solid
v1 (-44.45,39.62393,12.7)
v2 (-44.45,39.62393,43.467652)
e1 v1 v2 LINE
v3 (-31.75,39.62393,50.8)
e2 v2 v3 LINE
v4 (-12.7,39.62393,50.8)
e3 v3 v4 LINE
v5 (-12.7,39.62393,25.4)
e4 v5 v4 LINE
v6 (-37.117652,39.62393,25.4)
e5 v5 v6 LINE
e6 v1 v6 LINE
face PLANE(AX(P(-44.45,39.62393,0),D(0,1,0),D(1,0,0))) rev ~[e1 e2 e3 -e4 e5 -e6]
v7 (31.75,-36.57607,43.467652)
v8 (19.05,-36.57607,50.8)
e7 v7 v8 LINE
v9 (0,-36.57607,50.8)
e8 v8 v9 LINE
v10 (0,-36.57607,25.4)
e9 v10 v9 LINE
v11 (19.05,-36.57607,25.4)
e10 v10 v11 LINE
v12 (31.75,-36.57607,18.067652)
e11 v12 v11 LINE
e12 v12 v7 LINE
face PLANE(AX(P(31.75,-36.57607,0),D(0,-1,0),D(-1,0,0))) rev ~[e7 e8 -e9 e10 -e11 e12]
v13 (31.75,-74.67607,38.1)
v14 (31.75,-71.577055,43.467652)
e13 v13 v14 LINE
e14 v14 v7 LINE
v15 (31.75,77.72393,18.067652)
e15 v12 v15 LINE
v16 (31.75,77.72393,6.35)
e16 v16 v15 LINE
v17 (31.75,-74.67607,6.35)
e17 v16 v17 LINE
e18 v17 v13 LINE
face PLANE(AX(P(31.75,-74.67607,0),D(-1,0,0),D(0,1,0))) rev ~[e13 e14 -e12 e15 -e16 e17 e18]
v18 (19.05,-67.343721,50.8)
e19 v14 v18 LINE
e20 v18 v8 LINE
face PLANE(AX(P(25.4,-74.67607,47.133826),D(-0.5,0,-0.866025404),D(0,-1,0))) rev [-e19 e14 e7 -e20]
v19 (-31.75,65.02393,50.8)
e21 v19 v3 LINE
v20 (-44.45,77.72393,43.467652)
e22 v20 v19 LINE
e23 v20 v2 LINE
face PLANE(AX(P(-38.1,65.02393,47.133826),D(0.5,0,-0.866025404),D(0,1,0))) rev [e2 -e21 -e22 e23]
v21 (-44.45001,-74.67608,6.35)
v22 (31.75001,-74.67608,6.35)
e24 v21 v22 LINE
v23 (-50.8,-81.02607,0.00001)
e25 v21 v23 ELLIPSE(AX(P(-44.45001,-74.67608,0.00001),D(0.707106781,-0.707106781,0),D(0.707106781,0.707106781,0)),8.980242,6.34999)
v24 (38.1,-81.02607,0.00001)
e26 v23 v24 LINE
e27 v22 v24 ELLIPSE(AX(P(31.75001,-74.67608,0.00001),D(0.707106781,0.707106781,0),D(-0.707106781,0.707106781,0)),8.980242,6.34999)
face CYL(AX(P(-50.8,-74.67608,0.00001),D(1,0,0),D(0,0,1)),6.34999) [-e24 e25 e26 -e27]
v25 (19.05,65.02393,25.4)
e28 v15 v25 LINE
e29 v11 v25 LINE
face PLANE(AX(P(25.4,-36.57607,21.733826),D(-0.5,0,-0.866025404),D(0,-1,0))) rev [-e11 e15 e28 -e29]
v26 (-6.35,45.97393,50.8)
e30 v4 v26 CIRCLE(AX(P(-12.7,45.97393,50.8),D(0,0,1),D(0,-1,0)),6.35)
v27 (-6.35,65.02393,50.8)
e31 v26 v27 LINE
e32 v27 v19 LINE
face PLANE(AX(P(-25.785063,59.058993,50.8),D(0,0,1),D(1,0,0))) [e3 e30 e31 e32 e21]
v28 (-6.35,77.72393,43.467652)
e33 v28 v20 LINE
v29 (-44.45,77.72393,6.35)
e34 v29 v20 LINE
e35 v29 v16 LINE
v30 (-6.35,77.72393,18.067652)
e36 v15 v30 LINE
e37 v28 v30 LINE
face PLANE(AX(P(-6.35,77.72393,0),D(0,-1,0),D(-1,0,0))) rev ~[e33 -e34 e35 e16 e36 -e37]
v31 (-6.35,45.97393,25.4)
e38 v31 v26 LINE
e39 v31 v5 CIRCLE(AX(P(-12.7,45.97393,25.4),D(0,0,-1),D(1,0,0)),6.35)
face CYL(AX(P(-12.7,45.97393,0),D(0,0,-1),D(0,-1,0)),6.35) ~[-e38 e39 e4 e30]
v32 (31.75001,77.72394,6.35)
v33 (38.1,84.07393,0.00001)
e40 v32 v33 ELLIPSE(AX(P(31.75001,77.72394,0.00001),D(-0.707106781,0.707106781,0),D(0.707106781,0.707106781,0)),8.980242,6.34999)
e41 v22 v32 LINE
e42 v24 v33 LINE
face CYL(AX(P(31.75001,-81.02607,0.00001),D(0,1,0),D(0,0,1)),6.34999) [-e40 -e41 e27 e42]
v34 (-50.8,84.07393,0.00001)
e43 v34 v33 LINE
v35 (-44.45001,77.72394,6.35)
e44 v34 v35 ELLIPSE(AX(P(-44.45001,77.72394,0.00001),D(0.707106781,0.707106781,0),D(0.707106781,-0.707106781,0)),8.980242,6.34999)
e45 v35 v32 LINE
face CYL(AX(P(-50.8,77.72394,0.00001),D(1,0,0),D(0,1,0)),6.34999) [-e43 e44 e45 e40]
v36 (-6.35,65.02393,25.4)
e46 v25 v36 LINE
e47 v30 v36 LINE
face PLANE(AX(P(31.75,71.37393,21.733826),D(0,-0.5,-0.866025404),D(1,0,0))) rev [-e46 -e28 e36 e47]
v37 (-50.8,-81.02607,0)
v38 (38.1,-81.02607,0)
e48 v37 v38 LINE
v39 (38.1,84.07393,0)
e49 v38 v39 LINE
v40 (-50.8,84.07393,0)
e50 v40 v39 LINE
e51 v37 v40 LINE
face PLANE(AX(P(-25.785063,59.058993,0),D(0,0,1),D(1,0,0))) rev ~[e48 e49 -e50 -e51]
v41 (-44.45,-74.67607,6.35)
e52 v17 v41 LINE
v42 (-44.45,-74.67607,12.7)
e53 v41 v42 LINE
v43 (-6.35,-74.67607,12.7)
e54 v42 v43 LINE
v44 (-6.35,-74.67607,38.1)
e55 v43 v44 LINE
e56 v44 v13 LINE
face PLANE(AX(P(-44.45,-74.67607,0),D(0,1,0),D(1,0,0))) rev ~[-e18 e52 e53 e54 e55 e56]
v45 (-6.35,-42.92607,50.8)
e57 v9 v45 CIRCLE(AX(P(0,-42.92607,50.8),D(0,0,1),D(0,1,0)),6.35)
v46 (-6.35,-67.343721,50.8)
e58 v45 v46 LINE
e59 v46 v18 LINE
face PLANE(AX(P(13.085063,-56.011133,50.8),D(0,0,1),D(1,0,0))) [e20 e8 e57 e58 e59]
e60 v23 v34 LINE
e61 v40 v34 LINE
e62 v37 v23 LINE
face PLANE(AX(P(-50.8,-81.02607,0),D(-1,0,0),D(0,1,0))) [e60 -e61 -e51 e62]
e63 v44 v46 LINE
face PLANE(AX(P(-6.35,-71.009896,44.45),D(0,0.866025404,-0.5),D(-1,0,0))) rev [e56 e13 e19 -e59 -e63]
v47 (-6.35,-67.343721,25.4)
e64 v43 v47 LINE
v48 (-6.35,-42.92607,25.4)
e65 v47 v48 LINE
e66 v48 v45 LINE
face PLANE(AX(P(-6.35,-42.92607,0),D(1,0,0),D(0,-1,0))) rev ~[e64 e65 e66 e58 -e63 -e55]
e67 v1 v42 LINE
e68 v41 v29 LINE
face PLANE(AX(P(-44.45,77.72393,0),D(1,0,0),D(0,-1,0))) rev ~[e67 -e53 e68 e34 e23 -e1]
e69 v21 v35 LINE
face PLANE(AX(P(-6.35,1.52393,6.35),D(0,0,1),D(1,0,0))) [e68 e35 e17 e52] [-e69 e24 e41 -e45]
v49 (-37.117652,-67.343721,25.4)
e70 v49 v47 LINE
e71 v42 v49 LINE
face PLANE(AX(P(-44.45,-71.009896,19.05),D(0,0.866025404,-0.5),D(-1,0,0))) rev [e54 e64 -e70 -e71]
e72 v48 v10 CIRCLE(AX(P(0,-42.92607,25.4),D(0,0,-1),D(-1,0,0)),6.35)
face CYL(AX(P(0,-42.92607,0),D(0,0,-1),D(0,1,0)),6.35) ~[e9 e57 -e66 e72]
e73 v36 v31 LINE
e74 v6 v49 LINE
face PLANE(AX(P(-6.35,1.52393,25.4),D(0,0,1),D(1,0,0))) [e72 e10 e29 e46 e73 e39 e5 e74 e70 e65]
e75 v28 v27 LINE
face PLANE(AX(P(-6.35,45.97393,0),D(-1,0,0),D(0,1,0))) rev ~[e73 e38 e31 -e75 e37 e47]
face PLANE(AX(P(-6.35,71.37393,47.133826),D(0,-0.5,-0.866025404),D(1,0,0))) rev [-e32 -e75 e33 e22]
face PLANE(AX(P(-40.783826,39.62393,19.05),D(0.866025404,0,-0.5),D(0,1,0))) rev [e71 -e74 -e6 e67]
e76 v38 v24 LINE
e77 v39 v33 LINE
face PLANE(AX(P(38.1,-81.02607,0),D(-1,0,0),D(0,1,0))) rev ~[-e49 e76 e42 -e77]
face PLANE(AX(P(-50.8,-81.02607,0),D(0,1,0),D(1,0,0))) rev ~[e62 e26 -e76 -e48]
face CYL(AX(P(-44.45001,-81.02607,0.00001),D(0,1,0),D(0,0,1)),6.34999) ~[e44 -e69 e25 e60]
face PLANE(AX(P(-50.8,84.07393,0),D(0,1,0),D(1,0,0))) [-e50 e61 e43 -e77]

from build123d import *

# Parameters (mm, degrees)
F0_W        = 88.9
F0_H        = 165.1
F1_DEPTH    = 6.35
F2_DEPTH    = 25.4
F3_DEPTH    = 50.8
F4_R        = 6.34999
F5_C1_SIZE2 = 12.7
F5_C1_SIZE  = 7.3323484187
F5_C2_SIZE2 = 12.7
F5_C2_SIZE  = 7.3323484187
F5_C3_SIZE2 = 12.7
F5_C3_SIZE  = 7.3323484187
F5_C4_SIZE2 = 12.7
F5_C4_SIZE  = 7.3323484187
F5_C5_SIZE2 = 7.3323484187
F5_C5_SIZE  = 12.7
F5_C6_SIZE2 = 7.3323484187
F5_C6_SIZE  = 12.7
F5_C7_SIZE2 = 12.7
F5_C7_SIZE  = 7.3323484187
F5_C8_SIZE2 = 7.3323484187
F5_C8_SIZE  = 12.7


# Not quite as in the source:
# - a fillet or chamfer is up to 0.001 mm smaller than in the source, because OpenCascade refuses the exact size


with BuildPart() as f1:
    # F0 (on Top) → F1 (new body)
    with BuildSketch(Plane.XY):
        with Locations((-6.35, 1.5239301443)):
            Rectangle(F0_W, F0_H)
        Polygon((-44.45, 39.6239301443), (-44.45, 77.7239301443), (-6.35, 77.7239301443), (31.75, 77.7239301443), (31.75, -36.5760698557), (31.75, -74.6760698557), (-6.35, -74.6760698557), (-44.45, -74.6760698557), align=None, mode=Mode.SUBTRACT)
        with BuildLine():
            Line((31.75, 77.7239301443), (-6.35, 77.7239301443))
            Line((-6.35, 77.7239301443), (-6.35, 45.9739301443))
            ThreePointArc((-6.35, 45.9739301443), (-8.2098719395, 41.4838020838), (-12.7, 39.6239301443))
            Line((-12.7, 39.6239301443), (-44.45, 39.6239301443))
            Line((-44.45, 39.6239301443), (-44.45, -74.6760698557))
            Line((-44.45, -74.6760698557), (-6.35, -74.6760698557))
            Line((-6.35, -74.6760698557), (-6.35, -42.9260698557))
            ThreePointArc((-6.35, -42.9260698557), (-4.4901280605, -38.4359417952), (0, -36.5760698557))
            Line((0, -36.5760698557), (31.75, -36.5760698557))
            Line((31.75, -36.5760698557), (31.75, 77.7239301443))
        make_face()
        with BuildLine():
            Line((-6.35, 77.7239301443), (-44.45, 77.7239301443))
            Line((-44.45, 77.7239301443), (-44.45, 39.6239301443))
            Line((-44.45, 39.6239301443), (-12.7, 39.6239301443))
            ThreePointArc((-12.7, 39.6239301443), (-8.2098719395, 41.4838020838), (-6.35, 45.9739301443))
            Line((-6.35, 45.9739301443), (-6.35, 77.7239301443))
        make_face()
        with BuildLine():
            Line((31.75, -74.6760698557), (31.75, -36.5760698557))
            Line((31.75, -36.5760698557), (0, -36.5760698557))
            ThreePointArc((0, -36.5760698557), (-4.4901280605, -38.4359417952), (-6.35, -42.9260698557))
            Line((-6.35, -42.9260698557), (-6.35, -74.6760698557))
            Line((-6.35, -74.6760698557), (31.75, -74.6760698557))
        make_face()
    extrude(amount=F1_DEPTH)

    # F0 (on Top) → F2 (join)
    with BuildSketch(Plane.XY):
        with BuildLine():
            Line((31.75, 77.7239301443), (-6.35, 77.7239301443))
            Line((-6.35, 77.7239301443), (-6.35, 45.9739301443))
            ThreePointArc((-6.35, 45.9739301443), (-8.2098719395, 41.4838020838), (-12.7, 39.6239301443))
            Line((-12.7, 39.6239301443), (-44.45, 39.6239301443))
            Line((-44.45, 39.6239301443), (-44.45, -74.6760698557))
            Line((-44.45, -74.6760698557), (-6.35, -74.6760698557))
            Line((-6.35, -74.6760698557), (-6.35, -42.9260698557))
            ThreePointArc((-6.35, -42.9260698557), (-4.4901280605, -38.4359417952), (0, -36.5760698557))
            Line((0, -36.5760698557), (31.75, -36.5760698557))
            Line((31.75, -36.5760698557), (31.75, 77.7239301443))
        make_face()
    extrude(amount=F2_DEPTH)

    # F0 (on Top) → F3 (join)
    with BuildSketch(Plane.XY):
        with BuildLine():
            Line((-6.35, 77.7239301443), (-44.45, 77.7239301443))
            Line((-44.45, 77.7239301443), (-44.45, 39.6239301443))
            Line((-44.45, 39.6239301443), (-12.7, 39.6239301443))
            ThreePointArc((-12.7, 39.6239301443), (-8.2098719395, 41.4838020838), (-6.35, 45.9739301443))
            Line((-6.35, 45.9739301443), (-6.35, 77.7239301443))
        make_face()
        with BuildLine():
            Line((31.75, -74.6760698557), (31.75, -36.5760698557))
            Line((31.75, -36.5760698557), (0, -36.5760698557))
            ThreePointArc((0, -36.5760698557), (-4.4901280605, -38.4359417952), (-6.35, -42.9260698557))
            Line((-6.35, -42.9260698557), (-6.35, -74.6760698557))
            Line((-6.35, -74.6760698557), (31.75, -74.6760698557))
        make_face()
    extrude(amount=F3_DEPTH)

    # F4 (radius 6.35 in the source; OpenCascade refuses exactly that, so slightly less here)
    f4_edges = [f1.edges().sort_by_distance(p)[0] for p in [
        (38.1, 1.52393, 6.35),
        (-6.35, -81.02607, 6.35),
        (-6.35, 84.07393, 6.35),
        (-50.8, 1.52393, 6.35),
    ]]
    fillet(f4_edges, radius=F4_R)

    # F5: chamfer of 12.7 x 7.3323484187 on 8 edges, made by hand

    # F5_c1
    f5_c1_edges = [f1.edges().sort_by_distance(p)[0] for p in [
        (12.7, 77.7239301443, 25.4),
    ]]
    f5_c1_side = f1.faces().sort_by_distance((12.7, 77.7239301443, 25.2533530316))[0]
    chamfer(f5_c1_edges, length=F5_C1_SIZE, length2=F5_C1_SIZE2, reference=f5_c1_side)

    # F5_c2
    f5_c2_edges = [f1.edges().sort_by_distance(p)[0] for p in [
        (-25.4, 77.7239301443, 50.8),
    ]]
    f5_c2_side = f1.faces().sort_by_distance((-25.4, 77.7239301443, 50.6533530316))[0]
    chamfer(f5_c2_edges, length=F5_C2_SIZE, length2=F5_C2_SIZE2, reference=f5_c2_side)

    # F5_c3
    f5_c3_edges = [f1.edges().sort_by_distance(p)[0] for p in [
        (31.75, -55.6260698557, 50.8),
    ]]
    f5_c3_side = f1.faces().sort_by_distance((31.75, -55.6260698557, 50.6533530316))[0]
    chamfer(f5_c3_edges, length=F5_C3_SIZE, length2=F5_C3_SIZE2, reference=f5_c3_side)

    # F5_c4
    f5_c4_edges = [f1.edges().sort_by_distance(p)[0] for p in [
        (31.75, 14.2239301443, 25.4),
    ]]
    f5_c4_side = f1.faces().sort_by_distance((31.75, 14.2239301443, 25.2533530316))[0]
    chamfer(f5_c4_edges, length=F5_C4_SIZE, length2=F5_C4_SIZE2, reference=f5_c4_side)

    # F5_c5
    f5_c5_edges = [f1.edges().sort_by_distance(p)[0] for p in [
        (-25.4, -74.6760698557, 25.4),
    ]]
    f5_c5_side = f1.faces().sort_by_distance((-25.4, -74.6760698557, 25.2533530316))[0]
    chamfer(f5_c5_edges, length=F5_C5_SIZE, length2=F5_C5_SIZE2, reference=f5_c5_side)

    # F5_c6
    f5_c6_edges = [f1.edges().sort_by_distance(p)[0] for p in [
        (6.35, -74.6760698557, 50.8),
    ]]
    f5_c6_side = f1.faces().sort_by_distance((6.35, -74.6760698557, 50.6533530316))[0]
    chamfer(f5_c6_edges, length=F5_C6_SIZE, length2=F5_C6_SIZE2, reference=f5_c6_side)

    # F5_c7
    f5_c7_edges = [f1.edges().sort_by_distance(p)[0] for p in [
        (-44.45, 52.3239301443, 50.8),
    ]]
    f5_c7_side = f1.faces().sort_by_distance((-44.45, 52.3239301443, 50.6533530316))[0]
    chamfer(f5_c7_edges, length=F5_C7_SIZE, length2=F5_C7_SIZE2, reference=f5_c7_side)

    # F5_c8
    f5_c8_edges = [f1.edges().sort_by_distance(p)[0] for p in [
        (-44.45, -13.8598956463, 25.4),
    ]]
    f5_c8_side = f1.faces().sort_by_distance((-44.45, -13.8598956463, 25.2533530316))[0]
    chamfer(f5_c8_edges, length=F5_C8_SIZE, length2=F5_C8_SIZE2, reference=f5_c8_side)


solid = f1.part
